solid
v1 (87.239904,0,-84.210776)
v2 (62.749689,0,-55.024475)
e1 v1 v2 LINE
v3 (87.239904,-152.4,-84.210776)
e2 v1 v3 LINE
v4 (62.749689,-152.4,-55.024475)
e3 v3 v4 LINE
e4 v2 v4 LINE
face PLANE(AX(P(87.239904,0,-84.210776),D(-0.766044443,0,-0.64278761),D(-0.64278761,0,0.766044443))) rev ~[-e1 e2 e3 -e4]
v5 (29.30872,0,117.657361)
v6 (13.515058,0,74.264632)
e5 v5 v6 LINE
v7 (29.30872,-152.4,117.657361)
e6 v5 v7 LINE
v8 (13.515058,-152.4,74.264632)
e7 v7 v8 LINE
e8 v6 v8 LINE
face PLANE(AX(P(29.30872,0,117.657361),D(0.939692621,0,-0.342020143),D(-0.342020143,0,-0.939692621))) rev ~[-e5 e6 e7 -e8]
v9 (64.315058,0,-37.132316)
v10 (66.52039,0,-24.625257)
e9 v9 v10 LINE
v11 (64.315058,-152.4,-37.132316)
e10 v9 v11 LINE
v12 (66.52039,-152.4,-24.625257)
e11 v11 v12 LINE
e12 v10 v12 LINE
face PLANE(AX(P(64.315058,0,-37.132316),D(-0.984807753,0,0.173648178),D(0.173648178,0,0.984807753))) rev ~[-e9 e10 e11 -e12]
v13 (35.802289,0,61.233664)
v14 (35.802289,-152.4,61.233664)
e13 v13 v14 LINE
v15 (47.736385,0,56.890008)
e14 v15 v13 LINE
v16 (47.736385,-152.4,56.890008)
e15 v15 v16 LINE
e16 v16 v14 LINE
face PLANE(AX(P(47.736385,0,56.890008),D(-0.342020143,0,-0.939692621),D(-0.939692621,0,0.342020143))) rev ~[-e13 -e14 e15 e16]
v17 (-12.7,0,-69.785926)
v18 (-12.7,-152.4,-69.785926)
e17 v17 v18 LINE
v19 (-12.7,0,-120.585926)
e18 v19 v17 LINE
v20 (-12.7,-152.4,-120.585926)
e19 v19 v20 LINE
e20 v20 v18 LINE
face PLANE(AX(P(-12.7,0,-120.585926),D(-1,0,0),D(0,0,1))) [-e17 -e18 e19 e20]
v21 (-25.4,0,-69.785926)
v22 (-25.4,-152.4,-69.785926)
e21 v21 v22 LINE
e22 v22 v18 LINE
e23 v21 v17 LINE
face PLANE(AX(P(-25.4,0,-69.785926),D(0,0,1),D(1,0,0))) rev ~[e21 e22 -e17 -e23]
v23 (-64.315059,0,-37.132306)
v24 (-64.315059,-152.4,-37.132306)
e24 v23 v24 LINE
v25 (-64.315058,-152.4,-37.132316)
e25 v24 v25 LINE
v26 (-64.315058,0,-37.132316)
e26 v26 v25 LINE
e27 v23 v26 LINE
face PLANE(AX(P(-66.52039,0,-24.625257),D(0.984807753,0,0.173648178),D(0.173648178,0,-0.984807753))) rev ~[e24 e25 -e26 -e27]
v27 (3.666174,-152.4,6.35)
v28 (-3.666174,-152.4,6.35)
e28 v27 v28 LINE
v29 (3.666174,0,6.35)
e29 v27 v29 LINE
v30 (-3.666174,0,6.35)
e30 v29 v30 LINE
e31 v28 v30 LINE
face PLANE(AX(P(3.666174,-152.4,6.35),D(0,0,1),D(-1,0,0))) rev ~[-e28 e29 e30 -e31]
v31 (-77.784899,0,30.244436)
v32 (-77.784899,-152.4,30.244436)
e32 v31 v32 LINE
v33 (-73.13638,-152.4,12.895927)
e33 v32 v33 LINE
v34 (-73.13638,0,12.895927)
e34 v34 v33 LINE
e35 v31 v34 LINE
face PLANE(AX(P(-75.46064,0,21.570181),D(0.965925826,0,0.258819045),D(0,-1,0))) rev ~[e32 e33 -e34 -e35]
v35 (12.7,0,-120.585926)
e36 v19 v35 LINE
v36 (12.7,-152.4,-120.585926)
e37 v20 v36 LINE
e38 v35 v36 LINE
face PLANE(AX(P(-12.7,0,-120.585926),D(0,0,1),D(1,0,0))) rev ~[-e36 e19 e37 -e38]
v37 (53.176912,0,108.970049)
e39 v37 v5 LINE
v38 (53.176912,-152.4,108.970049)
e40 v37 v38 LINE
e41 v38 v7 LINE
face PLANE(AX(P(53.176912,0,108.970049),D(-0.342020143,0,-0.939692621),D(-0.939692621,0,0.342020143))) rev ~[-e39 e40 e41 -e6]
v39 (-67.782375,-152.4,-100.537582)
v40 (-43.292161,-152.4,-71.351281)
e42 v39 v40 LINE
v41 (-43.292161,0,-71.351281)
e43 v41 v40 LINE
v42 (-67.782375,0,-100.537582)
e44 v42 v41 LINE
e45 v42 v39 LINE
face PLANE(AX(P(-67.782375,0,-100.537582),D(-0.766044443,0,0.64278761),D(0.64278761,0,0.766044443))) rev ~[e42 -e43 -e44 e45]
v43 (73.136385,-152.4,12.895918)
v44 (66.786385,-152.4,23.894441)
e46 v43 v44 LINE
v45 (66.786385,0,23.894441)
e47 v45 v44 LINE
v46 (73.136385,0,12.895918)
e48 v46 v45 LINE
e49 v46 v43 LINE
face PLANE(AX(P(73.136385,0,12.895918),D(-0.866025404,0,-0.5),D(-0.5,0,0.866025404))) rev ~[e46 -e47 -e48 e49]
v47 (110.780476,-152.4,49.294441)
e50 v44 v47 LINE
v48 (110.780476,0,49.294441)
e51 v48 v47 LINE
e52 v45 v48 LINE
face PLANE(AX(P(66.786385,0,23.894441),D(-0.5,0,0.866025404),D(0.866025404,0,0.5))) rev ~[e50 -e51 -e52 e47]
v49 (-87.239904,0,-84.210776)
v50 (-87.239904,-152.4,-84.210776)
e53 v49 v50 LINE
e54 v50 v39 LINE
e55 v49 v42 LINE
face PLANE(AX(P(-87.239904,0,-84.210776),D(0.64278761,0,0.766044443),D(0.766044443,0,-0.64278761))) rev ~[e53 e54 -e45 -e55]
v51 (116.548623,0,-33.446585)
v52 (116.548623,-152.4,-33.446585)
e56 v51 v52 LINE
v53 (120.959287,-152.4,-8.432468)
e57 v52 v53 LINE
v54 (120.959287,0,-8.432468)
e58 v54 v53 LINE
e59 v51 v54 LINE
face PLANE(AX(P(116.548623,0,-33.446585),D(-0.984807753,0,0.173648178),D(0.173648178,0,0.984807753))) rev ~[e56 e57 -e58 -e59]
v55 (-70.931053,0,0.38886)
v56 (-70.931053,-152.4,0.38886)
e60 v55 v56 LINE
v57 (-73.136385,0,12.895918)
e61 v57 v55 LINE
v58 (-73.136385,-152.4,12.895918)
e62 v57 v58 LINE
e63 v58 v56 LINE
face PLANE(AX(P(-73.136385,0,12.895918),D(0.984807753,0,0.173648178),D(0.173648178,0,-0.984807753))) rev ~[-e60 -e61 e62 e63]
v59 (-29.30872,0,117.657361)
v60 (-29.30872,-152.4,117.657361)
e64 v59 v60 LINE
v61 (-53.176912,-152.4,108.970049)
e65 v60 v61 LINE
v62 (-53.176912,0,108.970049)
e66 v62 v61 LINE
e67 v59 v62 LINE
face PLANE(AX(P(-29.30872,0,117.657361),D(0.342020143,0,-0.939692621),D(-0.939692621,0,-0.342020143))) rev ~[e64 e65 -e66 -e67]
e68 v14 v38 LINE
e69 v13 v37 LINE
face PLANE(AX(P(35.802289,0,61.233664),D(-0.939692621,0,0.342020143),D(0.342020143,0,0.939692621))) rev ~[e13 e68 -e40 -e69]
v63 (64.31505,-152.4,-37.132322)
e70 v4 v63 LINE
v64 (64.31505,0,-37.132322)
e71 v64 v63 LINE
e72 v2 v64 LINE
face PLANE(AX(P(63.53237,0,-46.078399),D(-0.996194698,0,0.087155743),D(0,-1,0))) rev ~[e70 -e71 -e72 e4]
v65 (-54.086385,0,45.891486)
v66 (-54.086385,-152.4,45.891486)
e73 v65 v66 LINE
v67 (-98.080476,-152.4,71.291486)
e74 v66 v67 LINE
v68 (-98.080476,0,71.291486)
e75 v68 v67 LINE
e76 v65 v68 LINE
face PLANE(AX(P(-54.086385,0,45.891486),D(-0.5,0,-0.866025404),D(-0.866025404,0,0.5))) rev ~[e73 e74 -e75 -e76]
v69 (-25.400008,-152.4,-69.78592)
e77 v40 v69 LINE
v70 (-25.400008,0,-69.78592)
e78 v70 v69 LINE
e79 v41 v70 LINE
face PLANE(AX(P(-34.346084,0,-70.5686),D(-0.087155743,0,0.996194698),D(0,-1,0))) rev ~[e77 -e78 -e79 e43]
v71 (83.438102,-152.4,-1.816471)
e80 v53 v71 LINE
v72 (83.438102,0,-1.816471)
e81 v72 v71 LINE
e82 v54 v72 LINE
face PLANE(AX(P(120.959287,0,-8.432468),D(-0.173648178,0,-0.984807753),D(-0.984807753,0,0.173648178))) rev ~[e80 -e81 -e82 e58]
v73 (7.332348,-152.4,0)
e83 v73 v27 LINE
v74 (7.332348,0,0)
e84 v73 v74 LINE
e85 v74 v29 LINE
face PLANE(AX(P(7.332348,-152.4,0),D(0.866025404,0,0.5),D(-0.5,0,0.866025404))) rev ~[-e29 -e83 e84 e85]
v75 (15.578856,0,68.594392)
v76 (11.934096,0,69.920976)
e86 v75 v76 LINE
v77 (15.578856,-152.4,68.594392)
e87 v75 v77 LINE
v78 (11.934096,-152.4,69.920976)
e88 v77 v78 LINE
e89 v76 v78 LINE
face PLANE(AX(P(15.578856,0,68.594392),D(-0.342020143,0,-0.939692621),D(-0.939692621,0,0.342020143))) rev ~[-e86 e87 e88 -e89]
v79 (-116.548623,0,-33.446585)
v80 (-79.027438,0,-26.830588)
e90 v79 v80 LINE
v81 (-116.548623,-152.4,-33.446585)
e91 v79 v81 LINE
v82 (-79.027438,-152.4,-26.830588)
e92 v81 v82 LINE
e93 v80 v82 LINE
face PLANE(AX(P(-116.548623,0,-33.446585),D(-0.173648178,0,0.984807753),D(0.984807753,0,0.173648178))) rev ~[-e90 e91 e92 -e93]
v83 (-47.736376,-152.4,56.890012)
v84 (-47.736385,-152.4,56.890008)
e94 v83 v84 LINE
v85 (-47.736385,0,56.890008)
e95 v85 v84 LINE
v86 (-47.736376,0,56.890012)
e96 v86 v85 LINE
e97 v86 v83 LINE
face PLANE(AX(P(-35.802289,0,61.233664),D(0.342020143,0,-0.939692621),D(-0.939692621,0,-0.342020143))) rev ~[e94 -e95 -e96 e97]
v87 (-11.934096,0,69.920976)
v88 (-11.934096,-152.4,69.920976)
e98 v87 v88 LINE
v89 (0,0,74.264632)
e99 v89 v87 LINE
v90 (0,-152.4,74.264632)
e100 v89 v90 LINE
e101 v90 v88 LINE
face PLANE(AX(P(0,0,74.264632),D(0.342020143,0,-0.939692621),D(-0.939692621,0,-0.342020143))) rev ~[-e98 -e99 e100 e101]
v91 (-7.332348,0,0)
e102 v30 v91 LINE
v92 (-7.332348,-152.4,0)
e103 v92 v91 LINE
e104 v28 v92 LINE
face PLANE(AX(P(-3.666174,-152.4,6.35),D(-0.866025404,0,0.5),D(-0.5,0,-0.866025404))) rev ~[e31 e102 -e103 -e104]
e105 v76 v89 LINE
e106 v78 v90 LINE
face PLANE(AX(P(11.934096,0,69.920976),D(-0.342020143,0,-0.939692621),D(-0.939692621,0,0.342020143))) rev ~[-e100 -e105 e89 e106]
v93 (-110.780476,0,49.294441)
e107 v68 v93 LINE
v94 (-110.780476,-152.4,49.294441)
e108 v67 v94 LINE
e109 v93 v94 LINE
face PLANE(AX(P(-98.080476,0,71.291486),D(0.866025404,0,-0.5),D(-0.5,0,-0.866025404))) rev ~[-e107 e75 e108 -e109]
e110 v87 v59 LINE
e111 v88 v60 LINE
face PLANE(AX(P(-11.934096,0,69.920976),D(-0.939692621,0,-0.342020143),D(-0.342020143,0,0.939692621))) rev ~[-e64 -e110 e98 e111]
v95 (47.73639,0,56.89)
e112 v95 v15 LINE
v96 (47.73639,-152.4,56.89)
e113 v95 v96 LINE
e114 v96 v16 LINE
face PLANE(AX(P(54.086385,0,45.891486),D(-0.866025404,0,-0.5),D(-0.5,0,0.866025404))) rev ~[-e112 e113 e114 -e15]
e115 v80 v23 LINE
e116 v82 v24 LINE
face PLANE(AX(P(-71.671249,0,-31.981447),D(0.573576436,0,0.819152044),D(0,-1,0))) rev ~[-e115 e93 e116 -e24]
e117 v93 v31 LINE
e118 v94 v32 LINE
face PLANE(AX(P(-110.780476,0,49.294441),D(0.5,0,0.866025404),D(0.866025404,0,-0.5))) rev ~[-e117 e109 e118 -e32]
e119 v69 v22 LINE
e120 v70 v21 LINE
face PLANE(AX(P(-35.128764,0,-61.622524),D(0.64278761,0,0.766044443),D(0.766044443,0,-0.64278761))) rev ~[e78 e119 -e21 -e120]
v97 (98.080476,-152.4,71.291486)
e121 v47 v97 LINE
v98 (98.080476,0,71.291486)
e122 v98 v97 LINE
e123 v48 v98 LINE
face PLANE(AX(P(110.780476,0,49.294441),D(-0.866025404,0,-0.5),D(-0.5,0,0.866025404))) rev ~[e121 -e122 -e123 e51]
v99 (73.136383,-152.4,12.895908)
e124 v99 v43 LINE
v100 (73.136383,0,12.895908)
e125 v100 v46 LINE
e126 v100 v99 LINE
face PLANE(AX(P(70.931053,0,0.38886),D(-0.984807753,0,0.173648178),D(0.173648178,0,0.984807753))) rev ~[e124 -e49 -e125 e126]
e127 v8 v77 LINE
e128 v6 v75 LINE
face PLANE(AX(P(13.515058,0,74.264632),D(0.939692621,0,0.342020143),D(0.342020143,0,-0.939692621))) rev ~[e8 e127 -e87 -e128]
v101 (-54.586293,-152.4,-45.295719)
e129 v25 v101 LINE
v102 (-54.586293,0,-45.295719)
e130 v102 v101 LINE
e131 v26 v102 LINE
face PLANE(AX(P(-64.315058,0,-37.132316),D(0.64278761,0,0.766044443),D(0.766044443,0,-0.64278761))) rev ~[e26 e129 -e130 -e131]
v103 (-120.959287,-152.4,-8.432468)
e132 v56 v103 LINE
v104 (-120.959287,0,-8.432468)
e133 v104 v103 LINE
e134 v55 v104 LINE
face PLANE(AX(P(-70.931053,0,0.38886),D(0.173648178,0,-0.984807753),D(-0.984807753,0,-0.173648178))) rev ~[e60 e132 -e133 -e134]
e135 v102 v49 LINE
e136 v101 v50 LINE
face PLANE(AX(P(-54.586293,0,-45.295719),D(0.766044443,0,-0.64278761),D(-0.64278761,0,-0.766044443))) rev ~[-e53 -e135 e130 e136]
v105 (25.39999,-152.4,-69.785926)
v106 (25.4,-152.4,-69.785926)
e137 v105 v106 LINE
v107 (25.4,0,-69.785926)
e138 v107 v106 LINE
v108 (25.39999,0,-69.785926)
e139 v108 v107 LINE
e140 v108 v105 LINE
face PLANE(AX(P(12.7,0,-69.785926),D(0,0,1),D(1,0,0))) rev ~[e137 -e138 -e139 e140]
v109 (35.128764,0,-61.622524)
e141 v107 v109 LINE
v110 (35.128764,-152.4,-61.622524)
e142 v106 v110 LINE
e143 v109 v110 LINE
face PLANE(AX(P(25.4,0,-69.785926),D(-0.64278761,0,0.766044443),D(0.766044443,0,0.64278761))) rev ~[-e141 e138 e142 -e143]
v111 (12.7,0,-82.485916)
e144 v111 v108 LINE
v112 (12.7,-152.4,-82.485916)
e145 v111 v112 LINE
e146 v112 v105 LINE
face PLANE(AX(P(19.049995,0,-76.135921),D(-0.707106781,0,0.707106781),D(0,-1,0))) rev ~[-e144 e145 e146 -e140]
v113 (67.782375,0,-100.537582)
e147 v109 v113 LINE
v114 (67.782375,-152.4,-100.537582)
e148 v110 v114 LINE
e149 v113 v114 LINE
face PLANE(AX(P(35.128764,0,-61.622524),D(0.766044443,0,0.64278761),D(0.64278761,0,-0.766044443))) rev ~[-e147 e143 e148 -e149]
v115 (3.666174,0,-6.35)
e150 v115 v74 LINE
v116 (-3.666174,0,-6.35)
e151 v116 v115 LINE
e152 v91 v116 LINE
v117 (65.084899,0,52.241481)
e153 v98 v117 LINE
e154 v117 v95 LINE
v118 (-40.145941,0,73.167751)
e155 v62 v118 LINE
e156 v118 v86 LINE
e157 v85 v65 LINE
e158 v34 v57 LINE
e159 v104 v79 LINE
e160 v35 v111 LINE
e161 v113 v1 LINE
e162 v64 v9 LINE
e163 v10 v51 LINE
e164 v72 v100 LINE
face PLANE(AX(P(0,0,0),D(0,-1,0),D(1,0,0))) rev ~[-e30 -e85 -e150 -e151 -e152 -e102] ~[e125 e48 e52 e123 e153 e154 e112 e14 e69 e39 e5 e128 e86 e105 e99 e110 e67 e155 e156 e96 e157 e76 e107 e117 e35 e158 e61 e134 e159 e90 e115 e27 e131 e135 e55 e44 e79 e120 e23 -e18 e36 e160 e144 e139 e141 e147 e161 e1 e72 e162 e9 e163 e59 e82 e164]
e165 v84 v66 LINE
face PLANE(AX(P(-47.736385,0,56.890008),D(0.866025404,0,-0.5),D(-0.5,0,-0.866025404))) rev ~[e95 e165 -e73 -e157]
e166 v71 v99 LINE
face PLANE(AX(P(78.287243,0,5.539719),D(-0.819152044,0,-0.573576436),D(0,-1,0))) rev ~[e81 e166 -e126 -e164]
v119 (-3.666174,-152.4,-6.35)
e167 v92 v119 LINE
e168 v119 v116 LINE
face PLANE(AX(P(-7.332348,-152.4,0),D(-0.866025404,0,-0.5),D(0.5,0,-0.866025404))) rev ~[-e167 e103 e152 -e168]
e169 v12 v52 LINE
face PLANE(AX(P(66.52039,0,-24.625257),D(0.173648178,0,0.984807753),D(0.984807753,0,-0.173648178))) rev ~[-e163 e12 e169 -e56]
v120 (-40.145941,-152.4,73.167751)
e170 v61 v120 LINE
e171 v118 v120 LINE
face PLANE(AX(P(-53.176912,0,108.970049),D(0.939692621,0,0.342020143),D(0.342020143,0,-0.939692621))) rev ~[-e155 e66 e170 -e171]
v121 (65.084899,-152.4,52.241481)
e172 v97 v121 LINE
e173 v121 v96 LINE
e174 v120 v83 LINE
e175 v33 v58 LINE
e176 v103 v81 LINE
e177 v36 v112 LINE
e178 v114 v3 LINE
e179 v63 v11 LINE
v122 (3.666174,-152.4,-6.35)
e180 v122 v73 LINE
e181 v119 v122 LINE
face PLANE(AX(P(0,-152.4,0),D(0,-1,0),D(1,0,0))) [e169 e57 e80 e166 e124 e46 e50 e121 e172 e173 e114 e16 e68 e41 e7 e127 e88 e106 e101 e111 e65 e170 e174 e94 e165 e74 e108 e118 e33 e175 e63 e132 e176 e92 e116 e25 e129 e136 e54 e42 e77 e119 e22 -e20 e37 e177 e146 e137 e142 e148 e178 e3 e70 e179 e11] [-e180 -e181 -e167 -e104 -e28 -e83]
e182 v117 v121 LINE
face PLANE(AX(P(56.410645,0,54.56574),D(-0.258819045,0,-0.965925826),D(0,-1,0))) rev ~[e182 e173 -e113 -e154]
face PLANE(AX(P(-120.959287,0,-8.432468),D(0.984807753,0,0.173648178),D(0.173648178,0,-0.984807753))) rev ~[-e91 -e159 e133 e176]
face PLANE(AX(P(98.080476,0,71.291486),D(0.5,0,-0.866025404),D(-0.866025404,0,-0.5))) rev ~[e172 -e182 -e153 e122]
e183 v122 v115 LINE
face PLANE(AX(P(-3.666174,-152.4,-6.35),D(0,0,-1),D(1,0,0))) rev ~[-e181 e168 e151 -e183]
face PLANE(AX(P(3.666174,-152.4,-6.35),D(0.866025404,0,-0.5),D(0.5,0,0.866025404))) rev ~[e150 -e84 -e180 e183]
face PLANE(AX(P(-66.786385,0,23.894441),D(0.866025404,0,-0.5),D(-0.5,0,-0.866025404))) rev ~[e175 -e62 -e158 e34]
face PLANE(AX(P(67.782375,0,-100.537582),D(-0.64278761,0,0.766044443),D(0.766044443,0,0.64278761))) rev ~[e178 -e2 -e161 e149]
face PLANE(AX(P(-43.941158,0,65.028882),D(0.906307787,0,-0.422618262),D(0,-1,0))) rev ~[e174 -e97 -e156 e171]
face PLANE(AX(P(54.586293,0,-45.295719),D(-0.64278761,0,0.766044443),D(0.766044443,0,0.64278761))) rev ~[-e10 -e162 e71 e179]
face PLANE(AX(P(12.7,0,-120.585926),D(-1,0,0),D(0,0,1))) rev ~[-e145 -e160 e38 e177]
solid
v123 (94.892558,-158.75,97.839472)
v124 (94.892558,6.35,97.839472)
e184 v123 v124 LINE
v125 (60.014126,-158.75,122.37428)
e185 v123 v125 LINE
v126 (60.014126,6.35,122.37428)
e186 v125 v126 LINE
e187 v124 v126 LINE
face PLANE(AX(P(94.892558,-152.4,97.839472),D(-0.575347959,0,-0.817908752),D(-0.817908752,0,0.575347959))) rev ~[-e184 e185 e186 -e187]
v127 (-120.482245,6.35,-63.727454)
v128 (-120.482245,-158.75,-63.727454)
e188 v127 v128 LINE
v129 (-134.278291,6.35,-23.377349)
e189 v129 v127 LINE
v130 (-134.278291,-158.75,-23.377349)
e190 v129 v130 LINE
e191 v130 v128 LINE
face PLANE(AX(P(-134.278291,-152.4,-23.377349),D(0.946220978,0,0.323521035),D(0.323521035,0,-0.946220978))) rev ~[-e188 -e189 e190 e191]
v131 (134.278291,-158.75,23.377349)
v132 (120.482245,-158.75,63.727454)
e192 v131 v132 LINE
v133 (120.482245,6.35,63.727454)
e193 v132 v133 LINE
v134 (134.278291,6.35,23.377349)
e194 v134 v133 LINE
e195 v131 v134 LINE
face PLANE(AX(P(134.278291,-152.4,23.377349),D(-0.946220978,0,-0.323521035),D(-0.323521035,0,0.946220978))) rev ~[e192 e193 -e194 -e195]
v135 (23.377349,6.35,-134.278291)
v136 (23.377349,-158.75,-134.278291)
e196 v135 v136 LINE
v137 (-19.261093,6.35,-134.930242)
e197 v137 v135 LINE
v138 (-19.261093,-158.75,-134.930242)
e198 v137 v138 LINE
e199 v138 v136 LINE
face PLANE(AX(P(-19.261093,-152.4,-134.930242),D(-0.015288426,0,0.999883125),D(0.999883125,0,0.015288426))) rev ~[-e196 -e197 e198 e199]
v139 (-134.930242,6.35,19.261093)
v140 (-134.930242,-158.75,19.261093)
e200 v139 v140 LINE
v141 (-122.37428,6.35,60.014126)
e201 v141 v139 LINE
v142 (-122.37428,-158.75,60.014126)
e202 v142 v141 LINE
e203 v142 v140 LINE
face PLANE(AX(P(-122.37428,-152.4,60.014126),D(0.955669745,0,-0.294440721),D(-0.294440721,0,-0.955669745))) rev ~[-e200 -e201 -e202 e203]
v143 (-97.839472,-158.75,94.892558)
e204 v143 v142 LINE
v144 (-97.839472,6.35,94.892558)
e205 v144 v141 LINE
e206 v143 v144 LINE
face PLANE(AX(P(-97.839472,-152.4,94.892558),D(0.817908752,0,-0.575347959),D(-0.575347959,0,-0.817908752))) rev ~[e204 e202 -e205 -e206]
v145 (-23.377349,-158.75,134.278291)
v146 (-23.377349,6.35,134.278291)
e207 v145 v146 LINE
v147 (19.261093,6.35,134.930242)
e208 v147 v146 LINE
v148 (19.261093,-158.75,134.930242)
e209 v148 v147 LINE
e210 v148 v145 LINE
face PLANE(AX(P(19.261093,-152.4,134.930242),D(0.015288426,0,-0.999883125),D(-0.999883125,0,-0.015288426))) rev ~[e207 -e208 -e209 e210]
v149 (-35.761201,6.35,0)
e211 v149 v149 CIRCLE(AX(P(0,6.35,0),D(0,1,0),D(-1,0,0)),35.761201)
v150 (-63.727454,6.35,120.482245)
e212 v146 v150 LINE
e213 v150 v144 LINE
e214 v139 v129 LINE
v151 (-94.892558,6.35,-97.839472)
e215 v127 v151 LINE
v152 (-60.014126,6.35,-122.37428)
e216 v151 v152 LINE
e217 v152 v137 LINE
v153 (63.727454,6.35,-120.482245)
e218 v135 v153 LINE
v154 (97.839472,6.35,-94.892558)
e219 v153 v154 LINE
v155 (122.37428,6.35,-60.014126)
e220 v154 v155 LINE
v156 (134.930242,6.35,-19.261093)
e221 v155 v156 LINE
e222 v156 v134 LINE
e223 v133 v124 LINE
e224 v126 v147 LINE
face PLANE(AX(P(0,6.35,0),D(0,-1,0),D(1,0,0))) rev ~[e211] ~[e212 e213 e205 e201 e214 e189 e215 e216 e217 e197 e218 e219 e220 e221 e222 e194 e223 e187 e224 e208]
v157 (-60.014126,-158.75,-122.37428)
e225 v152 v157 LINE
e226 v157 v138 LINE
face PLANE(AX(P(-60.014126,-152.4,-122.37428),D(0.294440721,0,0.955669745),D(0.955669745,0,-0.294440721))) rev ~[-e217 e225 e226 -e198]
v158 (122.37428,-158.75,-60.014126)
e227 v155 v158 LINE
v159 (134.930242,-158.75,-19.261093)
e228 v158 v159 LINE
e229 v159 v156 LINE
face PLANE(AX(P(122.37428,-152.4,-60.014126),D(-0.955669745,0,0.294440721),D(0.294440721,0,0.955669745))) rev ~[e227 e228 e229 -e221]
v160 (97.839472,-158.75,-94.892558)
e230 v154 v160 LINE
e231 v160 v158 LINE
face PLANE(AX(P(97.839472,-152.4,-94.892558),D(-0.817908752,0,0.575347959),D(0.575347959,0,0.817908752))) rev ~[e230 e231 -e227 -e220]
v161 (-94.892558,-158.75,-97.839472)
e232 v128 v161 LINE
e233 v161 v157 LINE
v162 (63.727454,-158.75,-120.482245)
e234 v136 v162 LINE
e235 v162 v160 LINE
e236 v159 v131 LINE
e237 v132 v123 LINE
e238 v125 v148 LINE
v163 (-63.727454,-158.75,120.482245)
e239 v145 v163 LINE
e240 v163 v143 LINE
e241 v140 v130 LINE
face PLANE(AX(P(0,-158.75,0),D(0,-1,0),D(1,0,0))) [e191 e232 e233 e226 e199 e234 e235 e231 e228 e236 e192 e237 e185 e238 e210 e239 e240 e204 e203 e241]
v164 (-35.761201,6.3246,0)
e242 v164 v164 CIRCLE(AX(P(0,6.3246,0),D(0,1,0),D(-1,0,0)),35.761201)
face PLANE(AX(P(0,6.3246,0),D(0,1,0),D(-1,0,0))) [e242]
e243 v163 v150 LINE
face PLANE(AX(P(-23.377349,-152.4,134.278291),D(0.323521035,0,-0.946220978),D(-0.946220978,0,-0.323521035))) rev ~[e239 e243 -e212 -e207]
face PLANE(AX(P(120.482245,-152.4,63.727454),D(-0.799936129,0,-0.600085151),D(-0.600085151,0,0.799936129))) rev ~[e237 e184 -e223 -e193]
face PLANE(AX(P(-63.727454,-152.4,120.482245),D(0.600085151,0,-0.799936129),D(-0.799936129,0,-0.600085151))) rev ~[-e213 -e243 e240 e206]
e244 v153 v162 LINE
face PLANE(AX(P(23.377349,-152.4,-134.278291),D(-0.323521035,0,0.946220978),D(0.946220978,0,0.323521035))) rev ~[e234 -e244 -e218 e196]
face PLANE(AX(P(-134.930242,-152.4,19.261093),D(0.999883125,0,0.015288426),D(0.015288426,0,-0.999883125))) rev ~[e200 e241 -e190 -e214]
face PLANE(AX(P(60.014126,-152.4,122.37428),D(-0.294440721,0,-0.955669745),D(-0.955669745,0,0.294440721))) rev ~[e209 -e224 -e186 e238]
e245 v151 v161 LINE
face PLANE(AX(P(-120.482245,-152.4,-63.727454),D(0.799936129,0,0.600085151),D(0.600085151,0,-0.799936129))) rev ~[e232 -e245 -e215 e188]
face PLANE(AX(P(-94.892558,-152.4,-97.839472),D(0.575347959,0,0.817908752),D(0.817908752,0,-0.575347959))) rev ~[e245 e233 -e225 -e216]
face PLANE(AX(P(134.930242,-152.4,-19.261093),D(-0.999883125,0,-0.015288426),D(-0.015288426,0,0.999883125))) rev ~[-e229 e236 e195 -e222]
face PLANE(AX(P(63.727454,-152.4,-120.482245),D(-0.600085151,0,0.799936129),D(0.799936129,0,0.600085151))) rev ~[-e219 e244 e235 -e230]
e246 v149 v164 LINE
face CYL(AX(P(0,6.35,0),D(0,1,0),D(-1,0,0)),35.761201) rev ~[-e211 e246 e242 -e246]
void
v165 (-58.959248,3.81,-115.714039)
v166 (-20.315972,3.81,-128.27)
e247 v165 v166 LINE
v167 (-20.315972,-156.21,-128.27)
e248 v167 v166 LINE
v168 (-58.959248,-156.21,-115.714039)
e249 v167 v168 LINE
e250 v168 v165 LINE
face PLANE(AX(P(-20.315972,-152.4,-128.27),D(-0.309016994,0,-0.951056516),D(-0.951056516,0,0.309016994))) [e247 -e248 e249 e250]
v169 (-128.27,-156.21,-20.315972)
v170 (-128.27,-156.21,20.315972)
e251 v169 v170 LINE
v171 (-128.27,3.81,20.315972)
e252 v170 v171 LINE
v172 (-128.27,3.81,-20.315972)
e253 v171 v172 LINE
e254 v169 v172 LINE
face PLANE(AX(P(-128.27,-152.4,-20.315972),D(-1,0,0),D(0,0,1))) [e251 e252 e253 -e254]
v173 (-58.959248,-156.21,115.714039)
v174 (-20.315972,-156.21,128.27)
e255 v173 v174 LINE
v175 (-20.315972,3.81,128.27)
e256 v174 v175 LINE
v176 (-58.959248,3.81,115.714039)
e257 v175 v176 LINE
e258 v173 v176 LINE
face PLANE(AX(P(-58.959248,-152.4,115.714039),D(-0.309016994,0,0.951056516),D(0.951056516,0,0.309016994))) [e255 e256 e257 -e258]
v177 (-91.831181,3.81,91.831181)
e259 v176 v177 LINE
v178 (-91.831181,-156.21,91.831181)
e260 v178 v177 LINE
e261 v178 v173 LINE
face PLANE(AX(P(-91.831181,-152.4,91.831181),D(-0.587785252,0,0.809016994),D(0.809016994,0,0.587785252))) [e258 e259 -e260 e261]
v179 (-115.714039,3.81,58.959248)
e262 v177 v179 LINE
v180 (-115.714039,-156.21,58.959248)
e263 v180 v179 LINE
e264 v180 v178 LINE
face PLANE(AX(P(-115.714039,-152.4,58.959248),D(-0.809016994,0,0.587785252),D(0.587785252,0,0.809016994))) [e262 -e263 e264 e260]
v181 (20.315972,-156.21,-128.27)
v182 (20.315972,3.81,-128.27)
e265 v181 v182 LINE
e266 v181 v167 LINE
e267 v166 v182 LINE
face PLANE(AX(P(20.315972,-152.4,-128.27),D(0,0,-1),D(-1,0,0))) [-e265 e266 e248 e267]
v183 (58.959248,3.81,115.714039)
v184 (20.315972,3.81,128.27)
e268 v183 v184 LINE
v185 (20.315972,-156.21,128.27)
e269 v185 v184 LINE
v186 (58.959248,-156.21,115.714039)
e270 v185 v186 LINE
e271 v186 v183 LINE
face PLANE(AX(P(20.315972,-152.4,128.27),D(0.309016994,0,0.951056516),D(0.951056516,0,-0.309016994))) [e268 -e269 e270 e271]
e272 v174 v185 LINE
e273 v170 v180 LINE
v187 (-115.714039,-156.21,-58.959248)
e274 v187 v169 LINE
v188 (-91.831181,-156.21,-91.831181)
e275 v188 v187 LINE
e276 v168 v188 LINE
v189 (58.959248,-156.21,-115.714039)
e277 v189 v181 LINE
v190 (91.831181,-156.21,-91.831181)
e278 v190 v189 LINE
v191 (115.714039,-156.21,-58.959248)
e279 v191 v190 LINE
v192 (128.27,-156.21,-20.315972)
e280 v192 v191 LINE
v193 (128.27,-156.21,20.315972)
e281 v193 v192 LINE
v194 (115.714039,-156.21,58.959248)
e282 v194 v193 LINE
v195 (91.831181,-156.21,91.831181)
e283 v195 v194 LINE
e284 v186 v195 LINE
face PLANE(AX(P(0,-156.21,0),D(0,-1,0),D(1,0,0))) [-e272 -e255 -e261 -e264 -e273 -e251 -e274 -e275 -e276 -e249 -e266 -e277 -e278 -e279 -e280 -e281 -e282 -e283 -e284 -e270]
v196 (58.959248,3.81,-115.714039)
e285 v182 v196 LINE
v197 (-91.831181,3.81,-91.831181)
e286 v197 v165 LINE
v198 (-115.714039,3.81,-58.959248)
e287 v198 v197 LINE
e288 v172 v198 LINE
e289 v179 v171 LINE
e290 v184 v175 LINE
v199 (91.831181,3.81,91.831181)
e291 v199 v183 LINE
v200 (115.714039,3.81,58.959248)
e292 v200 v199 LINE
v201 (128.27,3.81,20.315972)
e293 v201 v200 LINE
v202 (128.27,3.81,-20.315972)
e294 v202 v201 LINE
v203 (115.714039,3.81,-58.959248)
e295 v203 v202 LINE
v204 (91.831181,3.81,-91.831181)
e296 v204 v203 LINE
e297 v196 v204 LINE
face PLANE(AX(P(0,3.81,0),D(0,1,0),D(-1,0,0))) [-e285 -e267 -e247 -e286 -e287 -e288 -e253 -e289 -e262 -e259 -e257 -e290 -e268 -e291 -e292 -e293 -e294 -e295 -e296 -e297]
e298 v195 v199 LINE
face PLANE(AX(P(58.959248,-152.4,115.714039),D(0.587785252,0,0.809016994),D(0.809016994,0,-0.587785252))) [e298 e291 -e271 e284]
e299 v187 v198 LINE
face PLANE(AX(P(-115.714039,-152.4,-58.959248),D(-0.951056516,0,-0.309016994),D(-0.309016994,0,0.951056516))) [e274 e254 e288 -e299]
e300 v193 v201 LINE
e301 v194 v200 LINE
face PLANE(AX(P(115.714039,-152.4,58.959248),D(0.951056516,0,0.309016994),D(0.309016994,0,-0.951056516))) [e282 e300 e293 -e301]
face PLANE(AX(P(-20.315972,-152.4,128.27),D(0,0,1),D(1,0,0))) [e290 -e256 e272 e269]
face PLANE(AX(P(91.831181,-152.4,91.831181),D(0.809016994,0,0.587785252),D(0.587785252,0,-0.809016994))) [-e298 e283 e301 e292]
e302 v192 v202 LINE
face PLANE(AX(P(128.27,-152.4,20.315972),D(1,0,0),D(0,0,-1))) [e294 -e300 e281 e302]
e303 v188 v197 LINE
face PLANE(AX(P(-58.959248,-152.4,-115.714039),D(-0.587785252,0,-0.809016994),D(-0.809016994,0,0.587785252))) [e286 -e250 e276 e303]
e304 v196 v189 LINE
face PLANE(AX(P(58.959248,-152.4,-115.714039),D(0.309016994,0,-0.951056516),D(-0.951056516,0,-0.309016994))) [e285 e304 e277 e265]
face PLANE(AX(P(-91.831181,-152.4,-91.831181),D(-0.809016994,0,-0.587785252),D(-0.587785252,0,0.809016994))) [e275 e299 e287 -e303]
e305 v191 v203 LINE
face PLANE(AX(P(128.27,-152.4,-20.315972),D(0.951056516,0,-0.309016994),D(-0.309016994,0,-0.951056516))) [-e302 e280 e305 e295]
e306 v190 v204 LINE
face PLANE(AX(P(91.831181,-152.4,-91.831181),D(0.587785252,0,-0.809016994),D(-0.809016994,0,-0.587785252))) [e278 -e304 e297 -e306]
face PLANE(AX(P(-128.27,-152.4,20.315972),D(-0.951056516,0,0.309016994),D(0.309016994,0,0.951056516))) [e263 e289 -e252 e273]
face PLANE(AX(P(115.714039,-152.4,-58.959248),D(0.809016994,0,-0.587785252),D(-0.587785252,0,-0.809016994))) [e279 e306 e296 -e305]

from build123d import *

# Parameters (mm, degrees)
F0_W          = 25.4
F0_H          = 50.8
F1_DEPTH      = 152.4
F2_SIZE       = 12.69999
F4_DEPTH      = 152.401
F6_DEPTH      = 158.75
F6_DEPTH_BACK = 6.35
F7_R          = 129.8689016848
F8_DEPTH      = 2.54
F9_R          = 129.8689016848
F10_DEPTH     = 2.54
F11_R         = 35.7612009526
F12_DEPTH     = 0.0254


# Not quite as in the source:
# - a fillet or chamfer is up to 0.001 mm smaller than in the source, because OpenCascade refuses the exact size


with BuildPart() as f1:
    # F0 (on Front) → F1 (new body)
    with BuildSketch(Plane.XZ):
        Polygon((12.7, -69.7859264541), (25.4, -69.7859264541), (35.1287644276, -61.6225238111), (54.5862932828, -45.2957185251), (64.3150577104, -37.1323158821), (66.5203895668, -24.6252574188), (70.9310532796, 0.3888595077), (73.1363851359, 12.8959179709), (66.7863851359, 23.894440599), (54.0863851359, 45.8914858551), (47.7363851359, 56.8900084832), (35.8022888519, 61.2336643034), (15.5788562807, 68.5943917941), (11.934096284, 69.9209759439), (0, 74.2646317641), (-11.934096284, 69.9209759439), (-35.8022888519, 61.2336643034), (-47.7363851359, 56.8900084832), (-54.0863851359, 45.8914858551), (-66.7863851359, 23.894440599), (-73.1363851359, 12.8959179709), (-70.9310532796, 0.3888595077), (-66.5203895668, -24.6252574188), (-64.3150577104, -37.1323158821), (-54.5862932828, -45.2957185251), (-35.1287644276, -61.6225238111), (-25.4, -69.7859264541), (-12.7, -69.7859264541), align=None)
        Polygon((-110.7804756482, 49.294440599), (-66.7863851359, 23.894440599), (-54.0863851359, 45.8914858551), (-98.0804756482, 71.2914858551), align=None)
        Polygon((-53.1769121329, 108.9700494394), (-35.8022888519, 61.2336643034), (-11.934096284, 69.9209759439), (-29.3087195649, 117.6573610798), align=None)
        Polygon((15.5788562807, 68.5943917941), (35.8022888519, 61.2336643034), (53.1769121329, 108.9700494394), (29.3087195649, 117.6573610798), (13.5150577104, 74.2646317641), align=None)
        Polygon((54.0863851359, 45.8914858551), (66.7863851359, 23.894440599), (110.7804756482, 49.294440599), (98.0804756482, 71.2914858551), align=None)
        Polygon((70.9310532796, 0.3888595077), (66.5203895668, -24.6252574188), (116.5486234198, -33.4465848443), (120.9592871326, -8.4324679178), align=None)
        Polygon((54.5862932828, -45.2957185251), (35.1287644276, -61.6225238111), (67.7823749997, -100.5375815216), (87.2399038549, -84.2107762355), align=None)
        with Locations((0, -95.1859264541)):
            Rectangle(F0_W, F0_H)
        Polygon((-67.7823749997, -100.5375815216), (-35.1287644276, -61.6225238111), (-54.5862932828, -45.2957185251), (-87.2399038549, -84.2107762355), align=None)
        Polygon((-116.5486234198, -33.4465848443), (-66.5203895668, -24.6252574188), (-70.9310532796, 0.3888595077), (-120.9592871326, -8.4324679178), align=None)
    extrude(amount=F1_DEPTH)

    # F2 (size 12.7 in the source; OpenCascade refuses exactly that, so slightly less here)
    f2_edges = [f1.edges().sort_by_distance(p)[0] for p in [
        (54.086385, -76.2, 45.891486),
        (12.7, -76.2, -69.785926),
        (-66.786385, -76.2, 23.894441),
        (54.586293, -76.2, -45.295719),
        (-35.802289, -76.2, 61.233664),
        (-66.52039, -76.2, -24.625257),
        (70.931053, -76.2, 0.38886),
        (-35.128764, -76.2, -61.622524),
    ]]
    chamfer(f2_edges, length=F2_SIZE)

    # F3 (on face) → F4 (cut, through all)
    with BuildSketch(Plane.XZ.offset(152.4)):
        Polygon((-3.6661742094, -6.35), (3.6661742094, -6.35), (7.3323484187, 0), (3.6661742094, 6.35), (-3.6661742094, 6.35), (-7.3323484187, 0), align=None)
    extrude(amount=-F4_DEPTH, mode=Mode.SUBTRACT)


with BuildPart() as f6:
    # F5 (on face) → F6 (new body, two sides)
    with BuildSketch(Plane.XZ.offset(152.4)) as f6_sk:
        Polygon((-122.3742804365, 60.0141262379), (-134.9302417462, 19.261093499), (-134.2782908794, -23.3773492715), (-120.4822453295, -63.7274542157), (-94.8925581576, -97.839471926), (-60.0141262379, -122.3742804365), (-19.261093499, -134.9302417462), (23.3773492715, -134.2782908794), (63.7274542157, -120.4822453295), (97.839471926, -94.8925581576), (122.3742804365, -60.0141262379), (134.9302417462, -19.261093499), (134.2782908794, 23.3773492715), (120.4822453295, 63.7274542157), (94.8925581576, 97.839471926), (60.0141262379, 122.3742804365), (19.261093499, 134.9302417462), (-23.3773492715, 134.2782908794), (-63.7274542157, 120.4822453295), (-97.839471926, 94.8925581576), align=None)
        Polygon((58.9592475765, -115.7140386904), (20.3159721604, -128.27), (-20.3159721604, -128.27), (-58.9592475765, -115.7140386904), (-91.8311810466, -91.8311810466), (-115.7140386904, -58.9592475765), (-128.27, -20.3159721604), (-128.27, 20.3159721604), (-115.7140386904, 58.9592475765), (-91.8311810466, 91.8311810466), (-58.9592475765, 115.7140386904), (-20.3159721604, 128.27), (20.3159721604, 128.27), (58.9592475765, 115.7140386904), (91.8311810466, 91.8311810466), (115.7140386904, 58.9592475765), (128.27, 20.3159721604), (128.27, -20.3159721604), (115.7140386904, -58.9592475765), (91.8311810466, -91.8311810466), align=None, mode=Mode.SUBTRACT)
    extrude(amount=-F6_DEPTH)
    extrude(f6_sk.sketch, amount=F6_DEPTH_BACK)

    # F7 (on face) → F8 (join)
    with BuildSketch(Plane.XZ.offset(158.75)):
        Circle(F7_R)
    extrude(amount=-F8_DEPTH)

    # F9 (on face) → F10 (join)
    with BuildSketch(Plane(origin=(0, 6.35, 0), x_dir=(-1, 0, 0), z_dir=(0, 1, 0))):
        Circle(F9_R)
    extrude(amount=-F10_DEPTH)

    # F11 (on face) → F12 (cut)
    with BuildSketch(Plane(origin=(0, 6.35, 0), x_dir=(-1, 0, 0), z_dir=(0, 1, 0))):
        Circle(F11_R)
    extrude(amount=-F12_DEPTH, mode=Mode.SUBTRACT)


solid = Compound([f1.part, f6.part])
